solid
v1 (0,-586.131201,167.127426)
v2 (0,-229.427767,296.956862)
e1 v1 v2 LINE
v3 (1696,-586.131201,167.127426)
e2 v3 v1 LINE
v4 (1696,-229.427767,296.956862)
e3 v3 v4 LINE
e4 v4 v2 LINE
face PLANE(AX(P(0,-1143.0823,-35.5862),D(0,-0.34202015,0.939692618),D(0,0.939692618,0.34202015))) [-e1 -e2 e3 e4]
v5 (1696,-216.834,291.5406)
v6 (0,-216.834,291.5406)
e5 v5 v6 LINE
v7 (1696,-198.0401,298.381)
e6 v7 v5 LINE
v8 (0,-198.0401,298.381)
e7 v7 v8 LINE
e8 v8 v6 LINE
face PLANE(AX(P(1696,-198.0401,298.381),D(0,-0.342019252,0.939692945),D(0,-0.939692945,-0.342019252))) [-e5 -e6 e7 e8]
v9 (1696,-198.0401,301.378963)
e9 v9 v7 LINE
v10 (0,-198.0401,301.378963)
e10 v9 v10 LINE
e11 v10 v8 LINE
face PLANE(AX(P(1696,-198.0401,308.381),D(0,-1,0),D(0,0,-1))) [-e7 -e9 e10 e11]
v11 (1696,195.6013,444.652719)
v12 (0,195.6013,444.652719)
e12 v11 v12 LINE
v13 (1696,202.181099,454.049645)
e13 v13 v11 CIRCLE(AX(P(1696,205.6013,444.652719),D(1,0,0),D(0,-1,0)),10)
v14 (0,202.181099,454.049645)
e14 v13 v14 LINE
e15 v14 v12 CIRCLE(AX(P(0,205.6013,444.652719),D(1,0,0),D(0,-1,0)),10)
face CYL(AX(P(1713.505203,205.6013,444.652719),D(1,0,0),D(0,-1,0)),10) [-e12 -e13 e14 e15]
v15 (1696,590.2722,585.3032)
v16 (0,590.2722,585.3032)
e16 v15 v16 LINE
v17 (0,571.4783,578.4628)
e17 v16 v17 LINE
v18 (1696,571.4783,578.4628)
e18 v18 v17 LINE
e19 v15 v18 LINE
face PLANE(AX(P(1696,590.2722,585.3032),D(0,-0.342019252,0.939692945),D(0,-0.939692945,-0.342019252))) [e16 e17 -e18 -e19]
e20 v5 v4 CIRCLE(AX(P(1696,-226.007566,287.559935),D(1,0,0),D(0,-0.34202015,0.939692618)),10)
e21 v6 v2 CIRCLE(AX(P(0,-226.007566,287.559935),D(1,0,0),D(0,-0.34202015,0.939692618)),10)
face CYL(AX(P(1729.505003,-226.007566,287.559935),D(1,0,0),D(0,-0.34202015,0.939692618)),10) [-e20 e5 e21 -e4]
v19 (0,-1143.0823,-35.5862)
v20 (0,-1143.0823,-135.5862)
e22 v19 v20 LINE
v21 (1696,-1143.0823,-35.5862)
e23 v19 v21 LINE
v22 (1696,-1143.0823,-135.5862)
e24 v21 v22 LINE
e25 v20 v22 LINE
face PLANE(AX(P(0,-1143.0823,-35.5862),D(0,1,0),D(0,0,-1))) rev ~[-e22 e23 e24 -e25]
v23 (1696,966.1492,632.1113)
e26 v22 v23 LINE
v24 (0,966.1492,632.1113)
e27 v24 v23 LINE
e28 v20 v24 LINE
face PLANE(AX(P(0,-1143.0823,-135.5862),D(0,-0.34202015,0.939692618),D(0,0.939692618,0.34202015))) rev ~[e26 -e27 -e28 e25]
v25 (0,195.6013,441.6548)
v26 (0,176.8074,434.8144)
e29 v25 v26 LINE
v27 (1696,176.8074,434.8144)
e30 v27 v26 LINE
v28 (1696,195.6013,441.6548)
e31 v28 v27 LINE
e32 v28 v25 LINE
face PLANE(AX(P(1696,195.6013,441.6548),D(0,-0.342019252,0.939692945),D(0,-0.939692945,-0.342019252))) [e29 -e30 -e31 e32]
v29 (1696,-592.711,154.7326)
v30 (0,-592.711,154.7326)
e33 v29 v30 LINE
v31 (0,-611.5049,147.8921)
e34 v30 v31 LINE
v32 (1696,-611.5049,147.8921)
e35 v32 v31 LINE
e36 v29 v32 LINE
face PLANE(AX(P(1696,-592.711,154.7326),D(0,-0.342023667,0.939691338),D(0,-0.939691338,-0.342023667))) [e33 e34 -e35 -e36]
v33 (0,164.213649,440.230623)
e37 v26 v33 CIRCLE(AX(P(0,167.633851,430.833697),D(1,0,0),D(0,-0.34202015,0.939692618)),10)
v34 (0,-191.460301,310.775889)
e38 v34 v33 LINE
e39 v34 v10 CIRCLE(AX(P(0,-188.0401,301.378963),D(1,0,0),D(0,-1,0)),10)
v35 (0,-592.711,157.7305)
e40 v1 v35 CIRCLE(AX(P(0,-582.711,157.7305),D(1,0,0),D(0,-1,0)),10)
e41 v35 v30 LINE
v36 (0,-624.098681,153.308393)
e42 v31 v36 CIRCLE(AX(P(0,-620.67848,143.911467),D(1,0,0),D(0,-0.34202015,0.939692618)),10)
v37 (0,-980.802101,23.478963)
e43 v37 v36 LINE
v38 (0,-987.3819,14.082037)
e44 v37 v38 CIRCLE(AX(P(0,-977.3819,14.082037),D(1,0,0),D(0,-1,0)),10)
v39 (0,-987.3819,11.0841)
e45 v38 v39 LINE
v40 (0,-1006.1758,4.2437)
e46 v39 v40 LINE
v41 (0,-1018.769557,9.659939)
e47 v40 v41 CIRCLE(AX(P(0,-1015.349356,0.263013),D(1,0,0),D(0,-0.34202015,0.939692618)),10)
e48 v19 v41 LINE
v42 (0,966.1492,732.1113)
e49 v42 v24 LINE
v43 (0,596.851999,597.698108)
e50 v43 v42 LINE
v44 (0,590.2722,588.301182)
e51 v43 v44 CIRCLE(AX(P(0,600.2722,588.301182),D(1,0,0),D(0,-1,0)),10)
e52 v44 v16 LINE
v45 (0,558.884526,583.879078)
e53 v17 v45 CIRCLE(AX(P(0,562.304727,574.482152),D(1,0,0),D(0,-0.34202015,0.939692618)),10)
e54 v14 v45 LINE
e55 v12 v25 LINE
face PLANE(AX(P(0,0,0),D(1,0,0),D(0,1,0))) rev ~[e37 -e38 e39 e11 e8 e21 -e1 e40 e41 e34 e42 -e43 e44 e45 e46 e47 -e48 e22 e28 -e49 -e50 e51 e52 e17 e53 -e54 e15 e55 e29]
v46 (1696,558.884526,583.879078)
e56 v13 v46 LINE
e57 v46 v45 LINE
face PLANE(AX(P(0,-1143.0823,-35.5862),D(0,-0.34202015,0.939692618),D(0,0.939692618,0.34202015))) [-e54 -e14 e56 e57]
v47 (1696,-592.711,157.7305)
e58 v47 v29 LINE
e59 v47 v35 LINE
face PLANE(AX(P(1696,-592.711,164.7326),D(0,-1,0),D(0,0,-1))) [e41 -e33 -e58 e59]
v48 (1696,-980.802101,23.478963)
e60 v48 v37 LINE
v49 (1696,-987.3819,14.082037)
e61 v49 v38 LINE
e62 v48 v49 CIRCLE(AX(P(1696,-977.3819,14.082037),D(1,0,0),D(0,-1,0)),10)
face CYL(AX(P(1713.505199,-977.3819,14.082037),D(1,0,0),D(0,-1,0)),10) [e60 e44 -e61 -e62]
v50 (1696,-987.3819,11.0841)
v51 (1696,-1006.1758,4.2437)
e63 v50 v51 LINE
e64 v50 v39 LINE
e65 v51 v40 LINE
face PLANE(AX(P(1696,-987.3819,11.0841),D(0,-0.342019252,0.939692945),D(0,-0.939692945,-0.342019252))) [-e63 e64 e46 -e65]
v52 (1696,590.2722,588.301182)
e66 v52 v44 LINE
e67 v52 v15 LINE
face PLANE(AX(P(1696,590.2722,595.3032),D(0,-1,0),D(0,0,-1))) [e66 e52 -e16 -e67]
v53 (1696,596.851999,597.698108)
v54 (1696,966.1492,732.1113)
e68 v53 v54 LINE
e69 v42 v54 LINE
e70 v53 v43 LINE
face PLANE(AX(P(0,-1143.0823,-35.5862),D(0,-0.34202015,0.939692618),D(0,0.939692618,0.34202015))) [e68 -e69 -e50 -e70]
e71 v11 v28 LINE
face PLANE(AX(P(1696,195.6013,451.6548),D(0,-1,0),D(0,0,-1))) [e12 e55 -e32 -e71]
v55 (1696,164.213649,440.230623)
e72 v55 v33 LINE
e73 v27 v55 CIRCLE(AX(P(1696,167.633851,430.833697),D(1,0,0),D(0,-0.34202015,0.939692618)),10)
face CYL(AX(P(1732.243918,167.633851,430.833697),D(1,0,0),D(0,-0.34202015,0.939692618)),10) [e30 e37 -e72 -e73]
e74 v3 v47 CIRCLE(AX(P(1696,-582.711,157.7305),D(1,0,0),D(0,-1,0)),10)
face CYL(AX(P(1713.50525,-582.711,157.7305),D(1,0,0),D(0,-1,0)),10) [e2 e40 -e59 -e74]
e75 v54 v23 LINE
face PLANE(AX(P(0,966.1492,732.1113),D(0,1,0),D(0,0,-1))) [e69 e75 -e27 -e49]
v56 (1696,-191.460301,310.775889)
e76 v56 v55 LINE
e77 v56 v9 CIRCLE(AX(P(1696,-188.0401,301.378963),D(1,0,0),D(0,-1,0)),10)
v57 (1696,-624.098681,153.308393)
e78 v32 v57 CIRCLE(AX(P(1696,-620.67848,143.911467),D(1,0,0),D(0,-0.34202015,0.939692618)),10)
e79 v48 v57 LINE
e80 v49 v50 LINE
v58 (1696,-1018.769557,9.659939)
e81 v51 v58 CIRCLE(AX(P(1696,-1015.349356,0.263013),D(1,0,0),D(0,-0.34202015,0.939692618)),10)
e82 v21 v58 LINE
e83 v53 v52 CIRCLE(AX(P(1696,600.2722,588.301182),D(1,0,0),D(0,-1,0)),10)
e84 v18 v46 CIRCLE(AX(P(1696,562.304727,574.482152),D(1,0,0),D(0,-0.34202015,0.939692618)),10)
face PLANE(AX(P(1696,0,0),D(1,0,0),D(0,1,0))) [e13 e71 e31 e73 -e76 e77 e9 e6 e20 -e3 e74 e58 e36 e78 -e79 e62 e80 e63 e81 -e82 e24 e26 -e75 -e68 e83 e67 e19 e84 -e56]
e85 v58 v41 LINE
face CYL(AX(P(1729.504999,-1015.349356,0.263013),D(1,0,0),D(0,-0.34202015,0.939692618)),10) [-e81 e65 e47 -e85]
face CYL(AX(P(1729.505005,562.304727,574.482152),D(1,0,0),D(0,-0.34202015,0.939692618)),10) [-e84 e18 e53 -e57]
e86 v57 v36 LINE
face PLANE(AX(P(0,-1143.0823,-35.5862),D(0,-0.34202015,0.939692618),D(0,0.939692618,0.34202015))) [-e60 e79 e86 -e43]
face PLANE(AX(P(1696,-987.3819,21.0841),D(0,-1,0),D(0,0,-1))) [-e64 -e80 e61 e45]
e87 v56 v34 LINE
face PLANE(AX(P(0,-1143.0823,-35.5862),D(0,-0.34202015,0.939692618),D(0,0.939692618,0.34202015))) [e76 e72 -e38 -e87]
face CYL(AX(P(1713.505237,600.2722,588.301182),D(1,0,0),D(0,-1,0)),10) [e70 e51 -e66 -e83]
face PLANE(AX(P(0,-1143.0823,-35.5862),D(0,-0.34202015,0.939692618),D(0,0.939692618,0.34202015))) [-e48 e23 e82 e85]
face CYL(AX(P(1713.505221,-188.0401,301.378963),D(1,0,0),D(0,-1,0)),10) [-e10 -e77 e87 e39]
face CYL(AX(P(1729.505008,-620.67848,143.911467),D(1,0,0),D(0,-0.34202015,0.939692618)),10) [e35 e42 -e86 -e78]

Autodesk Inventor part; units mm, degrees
ref_plane "YZ Plane" through (0, 0, 0) normal (1, 0, 0) x (0, 1, 0)
ref_plane "XZ Plane" through (0, 0, 0) normal (0, 1, 0) x (-1, 0, 0)
ref_plane "XY Plane" through (0, 0, 0) normal (0, 0, 1) x (1, 0, 0)
sketch "Sketch1" plane through (0, 0, 0) normal (1, 0, 0) x (0, 1, 0)
  line L0 (-1143.0823, -35.5862) -> (966.1492, 732.1113)
  line L1 (-1143.0823, -35.5862) -> (-1143.0823, -135.5862)
  line L2 (966.1492, 732.1113) -> (966.1492, 632.1113)
  line L3 (-1143.0823, -135.5862) -> (966.1492, 632.1113)
  point P0 (0, 0)
  point P1 (1136.1492, -719.9922)
extrude "Extrusion1" add sketch "Sketch1" along normal blind 1696
sketch "Sketch2" plane through (1696, 0, 0) normal (1, 0, 0) x (0, 0, -1)
  line L0 (-632.1113, 966.1492) -> (-732.1113, 966.1492) projected
  line L1 (-732.1113, 966.1492) -> (-595.3032, 590.2722)
  line L2 (-595.3032, 590.2722) -> (-585.3032, 590.2722)
  line L3 (-585.3032, 590.2722) -> (-578.4628, 571.4783)
  line L4 (-578.4628, 571.4783) -> (-588.4628, 571.4783)
  line L5 (-588.4628, 571.4783) -> (-451.6548, 195.6013)
  line L6 (-732.1113, 966.1492) -> (35.5862, -1143.0823) projected
  line L7 (-451.6548, 195.6013) -> (-441.6548, 195.6013)
  line L8 (-441.6548, 195.6013) -> (-434.8144, 176.8074)
  line L9 (-434.8144, 176.8074) -> (-445.1891, 177.8369)
  line L10 (-445.1891, 177.8369) -> (-308.381, -198.0401)
  line L11 (-308.381, -198.0401) -> (-298.381, -198.0401)
  line L12 (-298.381, -198.0401) -> (-291.5406, -216.834)
  line L13 (-291.5406, -216.834) -> (-301.5406, -216.834)
  line L14 (-301.5406, -216.834) -> (-164.7326, -592.711)
  line L15 (-164.7326, -592.711) -> (-154.7326, -592.711)
  line L16 (-154.7326, -592.711) -> (-147.8921, -611.5049)
  line L17 (-147.8921, -611.5049) -> (-157.8921, -611.5049)
  line L18 (-157.8921, -611.5049) -> (-21.0841, -987.3819)
  line L19 (-21.0841, -987.3819) -> (-11.0841, -987.3819)
  line L20 (-11.0841, -987.3819) -> (-4.2437, -1006.1758)
  line L21 (-4.2437, -1006.1758) -> (-14.2437, -1006.1758)
  line L22 (-14.2437, -1006.1758) -> (-595.3032, 590.2722)
  point P0 (0, 0)
  point P1 (-582.1113, 966.1492)
  dimension "d2" = 400
  dimension "d3" = 10
  dimension "d4" = 110
  dimension "d5" = 20
  dimension "d6" = 110
  dimension "d7" = 400
  dimension "d8" = 10
  dimension "d9" = 20
  dimension "d10" = 400
  dimension "d11" = 20
  dimension "d12" = 400
  dimension "d13" = 20
  dimension "d14" = 400
  dimension "d15" = 20
extrude "Extrusion2" cut sketch "Sketch2" against normal through all
fillet "Fillet1" radius 10 10 edges at (848, -1006.1758, 14.2437) (848, -987.3819, 21.0841) (848, -611.5049, 157.8921) (848, -592.711, 164.7326) (848, -216.834, 301.5406) (848, -198.0401, 308.381) (848, 177.8369, 445.1891) (848, 195.6013, 451.6548) (848, 571.4783, 588.4628) (848, 590.2722, 595.3032)
properties part number "side_curve_panel_02" material "Wood (Maple)"
